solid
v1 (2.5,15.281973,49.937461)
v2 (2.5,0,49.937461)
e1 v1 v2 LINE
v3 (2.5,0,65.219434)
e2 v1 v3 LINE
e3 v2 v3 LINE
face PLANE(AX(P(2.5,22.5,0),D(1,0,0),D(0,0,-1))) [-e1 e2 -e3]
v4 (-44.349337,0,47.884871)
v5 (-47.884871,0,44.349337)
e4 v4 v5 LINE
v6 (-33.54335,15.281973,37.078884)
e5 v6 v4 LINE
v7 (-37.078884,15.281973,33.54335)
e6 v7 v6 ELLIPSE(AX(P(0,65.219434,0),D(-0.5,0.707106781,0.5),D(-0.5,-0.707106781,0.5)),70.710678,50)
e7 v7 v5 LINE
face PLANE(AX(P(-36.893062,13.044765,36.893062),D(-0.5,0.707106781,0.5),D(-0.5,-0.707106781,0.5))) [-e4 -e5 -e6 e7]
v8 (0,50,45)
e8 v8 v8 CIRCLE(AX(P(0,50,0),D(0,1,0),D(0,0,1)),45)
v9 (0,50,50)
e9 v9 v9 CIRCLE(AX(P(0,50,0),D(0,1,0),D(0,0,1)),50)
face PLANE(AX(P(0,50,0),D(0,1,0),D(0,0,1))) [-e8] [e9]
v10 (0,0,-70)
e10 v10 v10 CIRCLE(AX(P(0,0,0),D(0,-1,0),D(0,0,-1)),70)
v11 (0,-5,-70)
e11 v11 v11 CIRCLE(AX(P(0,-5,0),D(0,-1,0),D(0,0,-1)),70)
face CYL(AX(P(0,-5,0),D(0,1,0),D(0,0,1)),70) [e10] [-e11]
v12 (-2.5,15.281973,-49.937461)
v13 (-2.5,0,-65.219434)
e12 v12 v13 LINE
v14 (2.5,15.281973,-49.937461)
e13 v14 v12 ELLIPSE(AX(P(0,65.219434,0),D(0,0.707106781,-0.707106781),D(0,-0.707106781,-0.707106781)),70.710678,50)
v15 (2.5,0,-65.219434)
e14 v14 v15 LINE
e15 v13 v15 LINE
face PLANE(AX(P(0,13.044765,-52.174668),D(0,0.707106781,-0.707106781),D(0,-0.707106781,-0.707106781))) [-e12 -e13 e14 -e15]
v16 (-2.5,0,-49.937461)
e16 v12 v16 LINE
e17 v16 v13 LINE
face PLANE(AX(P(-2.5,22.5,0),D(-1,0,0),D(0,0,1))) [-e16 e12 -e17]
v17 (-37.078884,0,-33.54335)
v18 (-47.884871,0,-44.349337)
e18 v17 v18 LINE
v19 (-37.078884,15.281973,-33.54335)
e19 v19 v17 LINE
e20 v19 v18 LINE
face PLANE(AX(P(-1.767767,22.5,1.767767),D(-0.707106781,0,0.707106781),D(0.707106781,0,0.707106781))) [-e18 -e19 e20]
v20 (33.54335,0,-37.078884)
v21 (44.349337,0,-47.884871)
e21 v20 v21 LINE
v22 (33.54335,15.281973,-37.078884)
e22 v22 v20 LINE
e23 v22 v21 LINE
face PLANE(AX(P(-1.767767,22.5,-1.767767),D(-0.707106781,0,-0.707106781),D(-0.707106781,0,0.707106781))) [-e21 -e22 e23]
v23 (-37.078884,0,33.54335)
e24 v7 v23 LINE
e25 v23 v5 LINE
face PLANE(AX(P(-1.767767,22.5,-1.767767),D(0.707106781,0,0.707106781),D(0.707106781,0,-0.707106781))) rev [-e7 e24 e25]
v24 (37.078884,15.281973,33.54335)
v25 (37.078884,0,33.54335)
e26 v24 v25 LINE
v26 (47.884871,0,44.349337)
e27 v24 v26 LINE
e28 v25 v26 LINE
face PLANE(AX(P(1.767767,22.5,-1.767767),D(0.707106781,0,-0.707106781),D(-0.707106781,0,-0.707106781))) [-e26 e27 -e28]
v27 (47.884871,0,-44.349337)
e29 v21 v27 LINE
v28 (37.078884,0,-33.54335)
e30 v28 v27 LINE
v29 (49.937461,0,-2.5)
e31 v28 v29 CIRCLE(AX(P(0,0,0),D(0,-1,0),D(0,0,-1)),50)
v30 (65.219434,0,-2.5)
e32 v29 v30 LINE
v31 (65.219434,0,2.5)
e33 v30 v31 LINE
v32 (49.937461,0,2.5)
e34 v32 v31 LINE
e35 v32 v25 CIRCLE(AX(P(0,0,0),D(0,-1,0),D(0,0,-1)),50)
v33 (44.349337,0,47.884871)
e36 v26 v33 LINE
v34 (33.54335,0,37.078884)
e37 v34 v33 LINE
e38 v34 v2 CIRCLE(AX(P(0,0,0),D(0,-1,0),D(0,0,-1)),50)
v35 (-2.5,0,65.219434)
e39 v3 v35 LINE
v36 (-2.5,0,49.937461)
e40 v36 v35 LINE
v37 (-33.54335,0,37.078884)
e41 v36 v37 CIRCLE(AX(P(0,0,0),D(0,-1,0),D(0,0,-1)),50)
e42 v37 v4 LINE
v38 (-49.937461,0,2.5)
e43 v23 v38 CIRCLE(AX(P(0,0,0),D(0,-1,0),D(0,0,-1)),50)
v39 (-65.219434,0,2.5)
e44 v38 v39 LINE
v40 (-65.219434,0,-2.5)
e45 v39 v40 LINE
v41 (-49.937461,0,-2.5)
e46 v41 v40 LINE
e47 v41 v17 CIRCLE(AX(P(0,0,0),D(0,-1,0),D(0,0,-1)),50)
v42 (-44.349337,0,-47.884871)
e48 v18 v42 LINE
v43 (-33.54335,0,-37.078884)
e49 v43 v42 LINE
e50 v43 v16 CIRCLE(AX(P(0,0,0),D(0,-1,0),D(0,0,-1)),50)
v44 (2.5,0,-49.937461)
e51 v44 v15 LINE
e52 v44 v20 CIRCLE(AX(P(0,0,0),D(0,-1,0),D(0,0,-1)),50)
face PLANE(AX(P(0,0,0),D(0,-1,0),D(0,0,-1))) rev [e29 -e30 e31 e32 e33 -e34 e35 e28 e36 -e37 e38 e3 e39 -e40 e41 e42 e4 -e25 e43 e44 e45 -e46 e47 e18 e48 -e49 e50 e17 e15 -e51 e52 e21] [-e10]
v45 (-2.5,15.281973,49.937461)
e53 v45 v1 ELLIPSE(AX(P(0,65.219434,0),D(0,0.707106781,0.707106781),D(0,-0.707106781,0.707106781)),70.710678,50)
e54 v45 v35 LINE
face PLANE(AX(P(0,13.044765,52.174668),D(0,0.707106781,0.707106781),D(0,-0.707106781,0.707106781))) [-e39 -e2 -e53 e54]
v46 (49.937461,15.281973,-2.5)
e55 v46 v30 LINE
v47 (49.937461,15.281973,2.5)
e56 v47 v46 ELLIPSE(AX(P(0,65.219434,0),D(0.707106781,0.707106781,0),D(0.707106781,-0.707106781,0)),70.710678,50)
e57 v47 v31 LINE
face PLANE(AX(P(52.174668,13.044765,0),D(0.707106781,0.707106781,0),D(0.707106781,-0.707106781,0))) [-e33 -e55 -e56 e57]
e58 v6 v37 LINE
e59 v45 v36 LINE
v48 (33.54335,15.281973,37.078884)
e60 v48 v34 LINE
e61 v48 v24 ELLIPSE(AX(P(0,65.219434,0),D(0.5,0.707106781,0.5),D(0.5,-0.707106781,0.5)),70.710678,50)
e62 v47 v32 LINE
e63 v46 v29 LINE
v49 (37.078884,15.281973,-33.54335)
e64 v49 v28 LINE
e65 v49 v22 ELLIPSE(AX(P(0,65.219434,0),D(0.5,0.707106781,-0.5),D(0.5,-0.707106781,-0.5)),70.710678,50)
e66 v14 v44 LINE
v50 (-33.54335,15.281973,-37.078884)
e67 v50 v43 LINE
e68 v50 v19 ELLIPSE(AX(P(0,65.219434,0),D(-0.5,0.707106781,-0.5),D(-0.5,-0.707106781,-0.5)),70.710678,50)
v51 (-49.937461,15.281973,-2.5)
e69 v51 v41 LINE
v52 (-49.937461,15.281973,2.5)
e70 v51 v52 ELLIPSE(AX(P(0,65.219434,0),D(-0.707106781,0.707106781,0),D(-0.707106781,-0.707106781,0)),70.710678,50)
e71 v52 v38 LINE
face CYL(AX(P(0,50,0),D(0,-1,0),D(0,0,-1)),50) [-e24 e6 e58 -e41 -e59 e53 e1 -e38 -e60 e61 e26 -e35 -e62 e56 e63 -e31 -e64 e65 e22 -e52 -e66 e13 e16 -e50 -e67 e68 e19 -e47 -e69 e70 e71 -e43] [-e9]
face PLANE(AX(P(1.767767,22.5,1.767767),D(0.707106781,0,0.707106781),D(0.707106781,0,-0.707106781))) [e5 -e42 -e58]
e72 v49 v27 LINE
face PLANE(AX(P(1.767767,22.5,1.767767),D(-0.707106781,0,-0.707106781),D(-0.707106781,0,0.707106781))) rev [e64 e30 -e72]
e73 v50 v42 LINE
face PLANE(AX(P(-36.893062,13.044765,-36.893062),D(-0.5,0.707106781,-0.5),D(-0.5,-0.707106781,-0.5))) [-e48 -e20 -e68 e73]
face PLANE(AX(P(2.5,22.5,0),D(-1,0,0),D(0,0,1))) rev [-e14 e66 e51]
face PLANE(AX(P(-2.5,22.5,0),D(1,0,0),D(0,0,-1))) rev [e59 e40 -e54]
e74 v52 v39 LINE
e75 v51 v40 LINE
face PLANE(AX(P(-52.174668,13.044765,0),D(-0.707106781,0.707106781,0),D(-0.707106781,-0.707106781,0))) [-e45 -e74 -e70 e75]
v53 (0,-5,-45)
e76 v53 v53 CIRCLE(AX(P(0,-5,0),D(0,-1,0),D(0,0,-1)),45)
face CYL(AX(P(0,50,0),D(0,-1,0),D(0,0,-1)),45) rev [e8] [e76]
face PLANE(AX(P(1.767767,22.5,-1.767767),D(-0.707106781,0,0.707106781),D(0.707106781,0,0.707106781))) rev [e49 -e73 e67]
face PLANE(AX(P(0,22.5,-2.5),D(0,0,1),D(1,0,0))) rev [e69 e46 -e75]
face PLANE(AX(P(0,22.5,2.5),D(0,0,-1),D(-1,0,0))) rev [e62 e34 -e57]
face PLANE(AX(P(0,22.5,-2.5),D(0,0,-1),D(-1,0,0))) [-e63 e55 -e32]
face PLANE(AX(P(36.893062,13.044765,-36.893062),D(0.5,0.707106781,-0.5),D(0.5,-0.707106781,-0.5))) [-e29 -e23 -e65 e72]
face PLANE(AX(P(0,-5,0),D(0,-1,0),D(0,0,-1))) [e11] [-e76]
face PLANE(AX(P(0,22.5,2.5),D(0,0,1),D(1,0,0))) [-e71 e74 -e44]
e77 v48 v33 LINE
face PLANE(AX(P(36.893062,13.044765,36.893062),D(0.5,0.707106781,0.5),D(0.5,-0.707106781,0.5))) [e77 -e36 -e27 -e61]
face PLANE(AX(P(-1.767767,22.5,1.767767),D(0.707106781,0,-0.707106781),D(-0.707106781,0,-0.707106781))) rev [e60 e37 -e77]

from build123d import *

# Parameters (mm, degrees)
SKETCH1_R           = 50
SKETCH1_R_2         = 45
BOSS_EXTRUDE1_DEPTH = 50
BOSS_EXTRUDE2_START = 5
SKETCH2_R           = 70
SKETCH2_R_2         = 45
BOSS_EXTRUDE2_DEPTH = 5
RIB1_REACH          = 112.905
SKETCH3_WALL_W      = 239.437922236
SKETCH3_WALL_H      = 5
CIRPATTERN1_COUNT   = 8


with BuildPart() as part:
    # Sketch1 → Boss-Extrude1 (new body)
    with BuildSketch(Plane(origin=(0, 0, 0), x_dir=(1, 0, 0), z_dir=(0, 1, 0))):
        Circle(SKETCH1_R)
        Circle(SKETCH1_R_2, mode=Mode.SUBTRACT)
    extrude(amount=BOSS_EXTRUDE1_DEPTH)

    # Sketch2 → Boss-Extrude2 (add)
    with BuildSketch(Plane.XZ.offset(BOSS_EXTRUDE2_START)):
        Circle(SKETCH2_R)
        Circle(SKETCH2_R_2, mode=Mode.SUBTRACT)
    extrude(amount=-BOSS_EXTRUDE2_DEPTH)

    # Sketch3 wall → Rib1 (add, up to next)
    with BuildSketch(Plane(origin=(0, 7.519718592, 57.699715082), x_dir=(0, -0.707106781187, 0.707106781187), z_dir=(0, -0.707106781187, -0.707106781187)), mode=Mode.PRIVATE) as rib1_sk1:
        Rectangle(SKETCH3_WALL_W, SKETCH3_WALL_H)
    rib1_tool1 = extrude(rib1_sk1.sketch, amount=RIB1_REACH, mode=Mode.PRIVATE) - part.part
    rib1 = rib1_tool1.solids().sort_by_distance((0, 7.519718592, 57.699715082))[0]
    add(rib1)

    # CirPattern1: Rib1 ×8 about axis
    cirpattern1_axis = Axis((0, -8.144073756, 0), (0, 1, 0))
    for i in range(1, CIRPATTERN1_COUNT):
        add(rib1.rotate(cirpattern1_axis, i * 360 / CIRPATTERN1_COUNT))


solid = part.part
